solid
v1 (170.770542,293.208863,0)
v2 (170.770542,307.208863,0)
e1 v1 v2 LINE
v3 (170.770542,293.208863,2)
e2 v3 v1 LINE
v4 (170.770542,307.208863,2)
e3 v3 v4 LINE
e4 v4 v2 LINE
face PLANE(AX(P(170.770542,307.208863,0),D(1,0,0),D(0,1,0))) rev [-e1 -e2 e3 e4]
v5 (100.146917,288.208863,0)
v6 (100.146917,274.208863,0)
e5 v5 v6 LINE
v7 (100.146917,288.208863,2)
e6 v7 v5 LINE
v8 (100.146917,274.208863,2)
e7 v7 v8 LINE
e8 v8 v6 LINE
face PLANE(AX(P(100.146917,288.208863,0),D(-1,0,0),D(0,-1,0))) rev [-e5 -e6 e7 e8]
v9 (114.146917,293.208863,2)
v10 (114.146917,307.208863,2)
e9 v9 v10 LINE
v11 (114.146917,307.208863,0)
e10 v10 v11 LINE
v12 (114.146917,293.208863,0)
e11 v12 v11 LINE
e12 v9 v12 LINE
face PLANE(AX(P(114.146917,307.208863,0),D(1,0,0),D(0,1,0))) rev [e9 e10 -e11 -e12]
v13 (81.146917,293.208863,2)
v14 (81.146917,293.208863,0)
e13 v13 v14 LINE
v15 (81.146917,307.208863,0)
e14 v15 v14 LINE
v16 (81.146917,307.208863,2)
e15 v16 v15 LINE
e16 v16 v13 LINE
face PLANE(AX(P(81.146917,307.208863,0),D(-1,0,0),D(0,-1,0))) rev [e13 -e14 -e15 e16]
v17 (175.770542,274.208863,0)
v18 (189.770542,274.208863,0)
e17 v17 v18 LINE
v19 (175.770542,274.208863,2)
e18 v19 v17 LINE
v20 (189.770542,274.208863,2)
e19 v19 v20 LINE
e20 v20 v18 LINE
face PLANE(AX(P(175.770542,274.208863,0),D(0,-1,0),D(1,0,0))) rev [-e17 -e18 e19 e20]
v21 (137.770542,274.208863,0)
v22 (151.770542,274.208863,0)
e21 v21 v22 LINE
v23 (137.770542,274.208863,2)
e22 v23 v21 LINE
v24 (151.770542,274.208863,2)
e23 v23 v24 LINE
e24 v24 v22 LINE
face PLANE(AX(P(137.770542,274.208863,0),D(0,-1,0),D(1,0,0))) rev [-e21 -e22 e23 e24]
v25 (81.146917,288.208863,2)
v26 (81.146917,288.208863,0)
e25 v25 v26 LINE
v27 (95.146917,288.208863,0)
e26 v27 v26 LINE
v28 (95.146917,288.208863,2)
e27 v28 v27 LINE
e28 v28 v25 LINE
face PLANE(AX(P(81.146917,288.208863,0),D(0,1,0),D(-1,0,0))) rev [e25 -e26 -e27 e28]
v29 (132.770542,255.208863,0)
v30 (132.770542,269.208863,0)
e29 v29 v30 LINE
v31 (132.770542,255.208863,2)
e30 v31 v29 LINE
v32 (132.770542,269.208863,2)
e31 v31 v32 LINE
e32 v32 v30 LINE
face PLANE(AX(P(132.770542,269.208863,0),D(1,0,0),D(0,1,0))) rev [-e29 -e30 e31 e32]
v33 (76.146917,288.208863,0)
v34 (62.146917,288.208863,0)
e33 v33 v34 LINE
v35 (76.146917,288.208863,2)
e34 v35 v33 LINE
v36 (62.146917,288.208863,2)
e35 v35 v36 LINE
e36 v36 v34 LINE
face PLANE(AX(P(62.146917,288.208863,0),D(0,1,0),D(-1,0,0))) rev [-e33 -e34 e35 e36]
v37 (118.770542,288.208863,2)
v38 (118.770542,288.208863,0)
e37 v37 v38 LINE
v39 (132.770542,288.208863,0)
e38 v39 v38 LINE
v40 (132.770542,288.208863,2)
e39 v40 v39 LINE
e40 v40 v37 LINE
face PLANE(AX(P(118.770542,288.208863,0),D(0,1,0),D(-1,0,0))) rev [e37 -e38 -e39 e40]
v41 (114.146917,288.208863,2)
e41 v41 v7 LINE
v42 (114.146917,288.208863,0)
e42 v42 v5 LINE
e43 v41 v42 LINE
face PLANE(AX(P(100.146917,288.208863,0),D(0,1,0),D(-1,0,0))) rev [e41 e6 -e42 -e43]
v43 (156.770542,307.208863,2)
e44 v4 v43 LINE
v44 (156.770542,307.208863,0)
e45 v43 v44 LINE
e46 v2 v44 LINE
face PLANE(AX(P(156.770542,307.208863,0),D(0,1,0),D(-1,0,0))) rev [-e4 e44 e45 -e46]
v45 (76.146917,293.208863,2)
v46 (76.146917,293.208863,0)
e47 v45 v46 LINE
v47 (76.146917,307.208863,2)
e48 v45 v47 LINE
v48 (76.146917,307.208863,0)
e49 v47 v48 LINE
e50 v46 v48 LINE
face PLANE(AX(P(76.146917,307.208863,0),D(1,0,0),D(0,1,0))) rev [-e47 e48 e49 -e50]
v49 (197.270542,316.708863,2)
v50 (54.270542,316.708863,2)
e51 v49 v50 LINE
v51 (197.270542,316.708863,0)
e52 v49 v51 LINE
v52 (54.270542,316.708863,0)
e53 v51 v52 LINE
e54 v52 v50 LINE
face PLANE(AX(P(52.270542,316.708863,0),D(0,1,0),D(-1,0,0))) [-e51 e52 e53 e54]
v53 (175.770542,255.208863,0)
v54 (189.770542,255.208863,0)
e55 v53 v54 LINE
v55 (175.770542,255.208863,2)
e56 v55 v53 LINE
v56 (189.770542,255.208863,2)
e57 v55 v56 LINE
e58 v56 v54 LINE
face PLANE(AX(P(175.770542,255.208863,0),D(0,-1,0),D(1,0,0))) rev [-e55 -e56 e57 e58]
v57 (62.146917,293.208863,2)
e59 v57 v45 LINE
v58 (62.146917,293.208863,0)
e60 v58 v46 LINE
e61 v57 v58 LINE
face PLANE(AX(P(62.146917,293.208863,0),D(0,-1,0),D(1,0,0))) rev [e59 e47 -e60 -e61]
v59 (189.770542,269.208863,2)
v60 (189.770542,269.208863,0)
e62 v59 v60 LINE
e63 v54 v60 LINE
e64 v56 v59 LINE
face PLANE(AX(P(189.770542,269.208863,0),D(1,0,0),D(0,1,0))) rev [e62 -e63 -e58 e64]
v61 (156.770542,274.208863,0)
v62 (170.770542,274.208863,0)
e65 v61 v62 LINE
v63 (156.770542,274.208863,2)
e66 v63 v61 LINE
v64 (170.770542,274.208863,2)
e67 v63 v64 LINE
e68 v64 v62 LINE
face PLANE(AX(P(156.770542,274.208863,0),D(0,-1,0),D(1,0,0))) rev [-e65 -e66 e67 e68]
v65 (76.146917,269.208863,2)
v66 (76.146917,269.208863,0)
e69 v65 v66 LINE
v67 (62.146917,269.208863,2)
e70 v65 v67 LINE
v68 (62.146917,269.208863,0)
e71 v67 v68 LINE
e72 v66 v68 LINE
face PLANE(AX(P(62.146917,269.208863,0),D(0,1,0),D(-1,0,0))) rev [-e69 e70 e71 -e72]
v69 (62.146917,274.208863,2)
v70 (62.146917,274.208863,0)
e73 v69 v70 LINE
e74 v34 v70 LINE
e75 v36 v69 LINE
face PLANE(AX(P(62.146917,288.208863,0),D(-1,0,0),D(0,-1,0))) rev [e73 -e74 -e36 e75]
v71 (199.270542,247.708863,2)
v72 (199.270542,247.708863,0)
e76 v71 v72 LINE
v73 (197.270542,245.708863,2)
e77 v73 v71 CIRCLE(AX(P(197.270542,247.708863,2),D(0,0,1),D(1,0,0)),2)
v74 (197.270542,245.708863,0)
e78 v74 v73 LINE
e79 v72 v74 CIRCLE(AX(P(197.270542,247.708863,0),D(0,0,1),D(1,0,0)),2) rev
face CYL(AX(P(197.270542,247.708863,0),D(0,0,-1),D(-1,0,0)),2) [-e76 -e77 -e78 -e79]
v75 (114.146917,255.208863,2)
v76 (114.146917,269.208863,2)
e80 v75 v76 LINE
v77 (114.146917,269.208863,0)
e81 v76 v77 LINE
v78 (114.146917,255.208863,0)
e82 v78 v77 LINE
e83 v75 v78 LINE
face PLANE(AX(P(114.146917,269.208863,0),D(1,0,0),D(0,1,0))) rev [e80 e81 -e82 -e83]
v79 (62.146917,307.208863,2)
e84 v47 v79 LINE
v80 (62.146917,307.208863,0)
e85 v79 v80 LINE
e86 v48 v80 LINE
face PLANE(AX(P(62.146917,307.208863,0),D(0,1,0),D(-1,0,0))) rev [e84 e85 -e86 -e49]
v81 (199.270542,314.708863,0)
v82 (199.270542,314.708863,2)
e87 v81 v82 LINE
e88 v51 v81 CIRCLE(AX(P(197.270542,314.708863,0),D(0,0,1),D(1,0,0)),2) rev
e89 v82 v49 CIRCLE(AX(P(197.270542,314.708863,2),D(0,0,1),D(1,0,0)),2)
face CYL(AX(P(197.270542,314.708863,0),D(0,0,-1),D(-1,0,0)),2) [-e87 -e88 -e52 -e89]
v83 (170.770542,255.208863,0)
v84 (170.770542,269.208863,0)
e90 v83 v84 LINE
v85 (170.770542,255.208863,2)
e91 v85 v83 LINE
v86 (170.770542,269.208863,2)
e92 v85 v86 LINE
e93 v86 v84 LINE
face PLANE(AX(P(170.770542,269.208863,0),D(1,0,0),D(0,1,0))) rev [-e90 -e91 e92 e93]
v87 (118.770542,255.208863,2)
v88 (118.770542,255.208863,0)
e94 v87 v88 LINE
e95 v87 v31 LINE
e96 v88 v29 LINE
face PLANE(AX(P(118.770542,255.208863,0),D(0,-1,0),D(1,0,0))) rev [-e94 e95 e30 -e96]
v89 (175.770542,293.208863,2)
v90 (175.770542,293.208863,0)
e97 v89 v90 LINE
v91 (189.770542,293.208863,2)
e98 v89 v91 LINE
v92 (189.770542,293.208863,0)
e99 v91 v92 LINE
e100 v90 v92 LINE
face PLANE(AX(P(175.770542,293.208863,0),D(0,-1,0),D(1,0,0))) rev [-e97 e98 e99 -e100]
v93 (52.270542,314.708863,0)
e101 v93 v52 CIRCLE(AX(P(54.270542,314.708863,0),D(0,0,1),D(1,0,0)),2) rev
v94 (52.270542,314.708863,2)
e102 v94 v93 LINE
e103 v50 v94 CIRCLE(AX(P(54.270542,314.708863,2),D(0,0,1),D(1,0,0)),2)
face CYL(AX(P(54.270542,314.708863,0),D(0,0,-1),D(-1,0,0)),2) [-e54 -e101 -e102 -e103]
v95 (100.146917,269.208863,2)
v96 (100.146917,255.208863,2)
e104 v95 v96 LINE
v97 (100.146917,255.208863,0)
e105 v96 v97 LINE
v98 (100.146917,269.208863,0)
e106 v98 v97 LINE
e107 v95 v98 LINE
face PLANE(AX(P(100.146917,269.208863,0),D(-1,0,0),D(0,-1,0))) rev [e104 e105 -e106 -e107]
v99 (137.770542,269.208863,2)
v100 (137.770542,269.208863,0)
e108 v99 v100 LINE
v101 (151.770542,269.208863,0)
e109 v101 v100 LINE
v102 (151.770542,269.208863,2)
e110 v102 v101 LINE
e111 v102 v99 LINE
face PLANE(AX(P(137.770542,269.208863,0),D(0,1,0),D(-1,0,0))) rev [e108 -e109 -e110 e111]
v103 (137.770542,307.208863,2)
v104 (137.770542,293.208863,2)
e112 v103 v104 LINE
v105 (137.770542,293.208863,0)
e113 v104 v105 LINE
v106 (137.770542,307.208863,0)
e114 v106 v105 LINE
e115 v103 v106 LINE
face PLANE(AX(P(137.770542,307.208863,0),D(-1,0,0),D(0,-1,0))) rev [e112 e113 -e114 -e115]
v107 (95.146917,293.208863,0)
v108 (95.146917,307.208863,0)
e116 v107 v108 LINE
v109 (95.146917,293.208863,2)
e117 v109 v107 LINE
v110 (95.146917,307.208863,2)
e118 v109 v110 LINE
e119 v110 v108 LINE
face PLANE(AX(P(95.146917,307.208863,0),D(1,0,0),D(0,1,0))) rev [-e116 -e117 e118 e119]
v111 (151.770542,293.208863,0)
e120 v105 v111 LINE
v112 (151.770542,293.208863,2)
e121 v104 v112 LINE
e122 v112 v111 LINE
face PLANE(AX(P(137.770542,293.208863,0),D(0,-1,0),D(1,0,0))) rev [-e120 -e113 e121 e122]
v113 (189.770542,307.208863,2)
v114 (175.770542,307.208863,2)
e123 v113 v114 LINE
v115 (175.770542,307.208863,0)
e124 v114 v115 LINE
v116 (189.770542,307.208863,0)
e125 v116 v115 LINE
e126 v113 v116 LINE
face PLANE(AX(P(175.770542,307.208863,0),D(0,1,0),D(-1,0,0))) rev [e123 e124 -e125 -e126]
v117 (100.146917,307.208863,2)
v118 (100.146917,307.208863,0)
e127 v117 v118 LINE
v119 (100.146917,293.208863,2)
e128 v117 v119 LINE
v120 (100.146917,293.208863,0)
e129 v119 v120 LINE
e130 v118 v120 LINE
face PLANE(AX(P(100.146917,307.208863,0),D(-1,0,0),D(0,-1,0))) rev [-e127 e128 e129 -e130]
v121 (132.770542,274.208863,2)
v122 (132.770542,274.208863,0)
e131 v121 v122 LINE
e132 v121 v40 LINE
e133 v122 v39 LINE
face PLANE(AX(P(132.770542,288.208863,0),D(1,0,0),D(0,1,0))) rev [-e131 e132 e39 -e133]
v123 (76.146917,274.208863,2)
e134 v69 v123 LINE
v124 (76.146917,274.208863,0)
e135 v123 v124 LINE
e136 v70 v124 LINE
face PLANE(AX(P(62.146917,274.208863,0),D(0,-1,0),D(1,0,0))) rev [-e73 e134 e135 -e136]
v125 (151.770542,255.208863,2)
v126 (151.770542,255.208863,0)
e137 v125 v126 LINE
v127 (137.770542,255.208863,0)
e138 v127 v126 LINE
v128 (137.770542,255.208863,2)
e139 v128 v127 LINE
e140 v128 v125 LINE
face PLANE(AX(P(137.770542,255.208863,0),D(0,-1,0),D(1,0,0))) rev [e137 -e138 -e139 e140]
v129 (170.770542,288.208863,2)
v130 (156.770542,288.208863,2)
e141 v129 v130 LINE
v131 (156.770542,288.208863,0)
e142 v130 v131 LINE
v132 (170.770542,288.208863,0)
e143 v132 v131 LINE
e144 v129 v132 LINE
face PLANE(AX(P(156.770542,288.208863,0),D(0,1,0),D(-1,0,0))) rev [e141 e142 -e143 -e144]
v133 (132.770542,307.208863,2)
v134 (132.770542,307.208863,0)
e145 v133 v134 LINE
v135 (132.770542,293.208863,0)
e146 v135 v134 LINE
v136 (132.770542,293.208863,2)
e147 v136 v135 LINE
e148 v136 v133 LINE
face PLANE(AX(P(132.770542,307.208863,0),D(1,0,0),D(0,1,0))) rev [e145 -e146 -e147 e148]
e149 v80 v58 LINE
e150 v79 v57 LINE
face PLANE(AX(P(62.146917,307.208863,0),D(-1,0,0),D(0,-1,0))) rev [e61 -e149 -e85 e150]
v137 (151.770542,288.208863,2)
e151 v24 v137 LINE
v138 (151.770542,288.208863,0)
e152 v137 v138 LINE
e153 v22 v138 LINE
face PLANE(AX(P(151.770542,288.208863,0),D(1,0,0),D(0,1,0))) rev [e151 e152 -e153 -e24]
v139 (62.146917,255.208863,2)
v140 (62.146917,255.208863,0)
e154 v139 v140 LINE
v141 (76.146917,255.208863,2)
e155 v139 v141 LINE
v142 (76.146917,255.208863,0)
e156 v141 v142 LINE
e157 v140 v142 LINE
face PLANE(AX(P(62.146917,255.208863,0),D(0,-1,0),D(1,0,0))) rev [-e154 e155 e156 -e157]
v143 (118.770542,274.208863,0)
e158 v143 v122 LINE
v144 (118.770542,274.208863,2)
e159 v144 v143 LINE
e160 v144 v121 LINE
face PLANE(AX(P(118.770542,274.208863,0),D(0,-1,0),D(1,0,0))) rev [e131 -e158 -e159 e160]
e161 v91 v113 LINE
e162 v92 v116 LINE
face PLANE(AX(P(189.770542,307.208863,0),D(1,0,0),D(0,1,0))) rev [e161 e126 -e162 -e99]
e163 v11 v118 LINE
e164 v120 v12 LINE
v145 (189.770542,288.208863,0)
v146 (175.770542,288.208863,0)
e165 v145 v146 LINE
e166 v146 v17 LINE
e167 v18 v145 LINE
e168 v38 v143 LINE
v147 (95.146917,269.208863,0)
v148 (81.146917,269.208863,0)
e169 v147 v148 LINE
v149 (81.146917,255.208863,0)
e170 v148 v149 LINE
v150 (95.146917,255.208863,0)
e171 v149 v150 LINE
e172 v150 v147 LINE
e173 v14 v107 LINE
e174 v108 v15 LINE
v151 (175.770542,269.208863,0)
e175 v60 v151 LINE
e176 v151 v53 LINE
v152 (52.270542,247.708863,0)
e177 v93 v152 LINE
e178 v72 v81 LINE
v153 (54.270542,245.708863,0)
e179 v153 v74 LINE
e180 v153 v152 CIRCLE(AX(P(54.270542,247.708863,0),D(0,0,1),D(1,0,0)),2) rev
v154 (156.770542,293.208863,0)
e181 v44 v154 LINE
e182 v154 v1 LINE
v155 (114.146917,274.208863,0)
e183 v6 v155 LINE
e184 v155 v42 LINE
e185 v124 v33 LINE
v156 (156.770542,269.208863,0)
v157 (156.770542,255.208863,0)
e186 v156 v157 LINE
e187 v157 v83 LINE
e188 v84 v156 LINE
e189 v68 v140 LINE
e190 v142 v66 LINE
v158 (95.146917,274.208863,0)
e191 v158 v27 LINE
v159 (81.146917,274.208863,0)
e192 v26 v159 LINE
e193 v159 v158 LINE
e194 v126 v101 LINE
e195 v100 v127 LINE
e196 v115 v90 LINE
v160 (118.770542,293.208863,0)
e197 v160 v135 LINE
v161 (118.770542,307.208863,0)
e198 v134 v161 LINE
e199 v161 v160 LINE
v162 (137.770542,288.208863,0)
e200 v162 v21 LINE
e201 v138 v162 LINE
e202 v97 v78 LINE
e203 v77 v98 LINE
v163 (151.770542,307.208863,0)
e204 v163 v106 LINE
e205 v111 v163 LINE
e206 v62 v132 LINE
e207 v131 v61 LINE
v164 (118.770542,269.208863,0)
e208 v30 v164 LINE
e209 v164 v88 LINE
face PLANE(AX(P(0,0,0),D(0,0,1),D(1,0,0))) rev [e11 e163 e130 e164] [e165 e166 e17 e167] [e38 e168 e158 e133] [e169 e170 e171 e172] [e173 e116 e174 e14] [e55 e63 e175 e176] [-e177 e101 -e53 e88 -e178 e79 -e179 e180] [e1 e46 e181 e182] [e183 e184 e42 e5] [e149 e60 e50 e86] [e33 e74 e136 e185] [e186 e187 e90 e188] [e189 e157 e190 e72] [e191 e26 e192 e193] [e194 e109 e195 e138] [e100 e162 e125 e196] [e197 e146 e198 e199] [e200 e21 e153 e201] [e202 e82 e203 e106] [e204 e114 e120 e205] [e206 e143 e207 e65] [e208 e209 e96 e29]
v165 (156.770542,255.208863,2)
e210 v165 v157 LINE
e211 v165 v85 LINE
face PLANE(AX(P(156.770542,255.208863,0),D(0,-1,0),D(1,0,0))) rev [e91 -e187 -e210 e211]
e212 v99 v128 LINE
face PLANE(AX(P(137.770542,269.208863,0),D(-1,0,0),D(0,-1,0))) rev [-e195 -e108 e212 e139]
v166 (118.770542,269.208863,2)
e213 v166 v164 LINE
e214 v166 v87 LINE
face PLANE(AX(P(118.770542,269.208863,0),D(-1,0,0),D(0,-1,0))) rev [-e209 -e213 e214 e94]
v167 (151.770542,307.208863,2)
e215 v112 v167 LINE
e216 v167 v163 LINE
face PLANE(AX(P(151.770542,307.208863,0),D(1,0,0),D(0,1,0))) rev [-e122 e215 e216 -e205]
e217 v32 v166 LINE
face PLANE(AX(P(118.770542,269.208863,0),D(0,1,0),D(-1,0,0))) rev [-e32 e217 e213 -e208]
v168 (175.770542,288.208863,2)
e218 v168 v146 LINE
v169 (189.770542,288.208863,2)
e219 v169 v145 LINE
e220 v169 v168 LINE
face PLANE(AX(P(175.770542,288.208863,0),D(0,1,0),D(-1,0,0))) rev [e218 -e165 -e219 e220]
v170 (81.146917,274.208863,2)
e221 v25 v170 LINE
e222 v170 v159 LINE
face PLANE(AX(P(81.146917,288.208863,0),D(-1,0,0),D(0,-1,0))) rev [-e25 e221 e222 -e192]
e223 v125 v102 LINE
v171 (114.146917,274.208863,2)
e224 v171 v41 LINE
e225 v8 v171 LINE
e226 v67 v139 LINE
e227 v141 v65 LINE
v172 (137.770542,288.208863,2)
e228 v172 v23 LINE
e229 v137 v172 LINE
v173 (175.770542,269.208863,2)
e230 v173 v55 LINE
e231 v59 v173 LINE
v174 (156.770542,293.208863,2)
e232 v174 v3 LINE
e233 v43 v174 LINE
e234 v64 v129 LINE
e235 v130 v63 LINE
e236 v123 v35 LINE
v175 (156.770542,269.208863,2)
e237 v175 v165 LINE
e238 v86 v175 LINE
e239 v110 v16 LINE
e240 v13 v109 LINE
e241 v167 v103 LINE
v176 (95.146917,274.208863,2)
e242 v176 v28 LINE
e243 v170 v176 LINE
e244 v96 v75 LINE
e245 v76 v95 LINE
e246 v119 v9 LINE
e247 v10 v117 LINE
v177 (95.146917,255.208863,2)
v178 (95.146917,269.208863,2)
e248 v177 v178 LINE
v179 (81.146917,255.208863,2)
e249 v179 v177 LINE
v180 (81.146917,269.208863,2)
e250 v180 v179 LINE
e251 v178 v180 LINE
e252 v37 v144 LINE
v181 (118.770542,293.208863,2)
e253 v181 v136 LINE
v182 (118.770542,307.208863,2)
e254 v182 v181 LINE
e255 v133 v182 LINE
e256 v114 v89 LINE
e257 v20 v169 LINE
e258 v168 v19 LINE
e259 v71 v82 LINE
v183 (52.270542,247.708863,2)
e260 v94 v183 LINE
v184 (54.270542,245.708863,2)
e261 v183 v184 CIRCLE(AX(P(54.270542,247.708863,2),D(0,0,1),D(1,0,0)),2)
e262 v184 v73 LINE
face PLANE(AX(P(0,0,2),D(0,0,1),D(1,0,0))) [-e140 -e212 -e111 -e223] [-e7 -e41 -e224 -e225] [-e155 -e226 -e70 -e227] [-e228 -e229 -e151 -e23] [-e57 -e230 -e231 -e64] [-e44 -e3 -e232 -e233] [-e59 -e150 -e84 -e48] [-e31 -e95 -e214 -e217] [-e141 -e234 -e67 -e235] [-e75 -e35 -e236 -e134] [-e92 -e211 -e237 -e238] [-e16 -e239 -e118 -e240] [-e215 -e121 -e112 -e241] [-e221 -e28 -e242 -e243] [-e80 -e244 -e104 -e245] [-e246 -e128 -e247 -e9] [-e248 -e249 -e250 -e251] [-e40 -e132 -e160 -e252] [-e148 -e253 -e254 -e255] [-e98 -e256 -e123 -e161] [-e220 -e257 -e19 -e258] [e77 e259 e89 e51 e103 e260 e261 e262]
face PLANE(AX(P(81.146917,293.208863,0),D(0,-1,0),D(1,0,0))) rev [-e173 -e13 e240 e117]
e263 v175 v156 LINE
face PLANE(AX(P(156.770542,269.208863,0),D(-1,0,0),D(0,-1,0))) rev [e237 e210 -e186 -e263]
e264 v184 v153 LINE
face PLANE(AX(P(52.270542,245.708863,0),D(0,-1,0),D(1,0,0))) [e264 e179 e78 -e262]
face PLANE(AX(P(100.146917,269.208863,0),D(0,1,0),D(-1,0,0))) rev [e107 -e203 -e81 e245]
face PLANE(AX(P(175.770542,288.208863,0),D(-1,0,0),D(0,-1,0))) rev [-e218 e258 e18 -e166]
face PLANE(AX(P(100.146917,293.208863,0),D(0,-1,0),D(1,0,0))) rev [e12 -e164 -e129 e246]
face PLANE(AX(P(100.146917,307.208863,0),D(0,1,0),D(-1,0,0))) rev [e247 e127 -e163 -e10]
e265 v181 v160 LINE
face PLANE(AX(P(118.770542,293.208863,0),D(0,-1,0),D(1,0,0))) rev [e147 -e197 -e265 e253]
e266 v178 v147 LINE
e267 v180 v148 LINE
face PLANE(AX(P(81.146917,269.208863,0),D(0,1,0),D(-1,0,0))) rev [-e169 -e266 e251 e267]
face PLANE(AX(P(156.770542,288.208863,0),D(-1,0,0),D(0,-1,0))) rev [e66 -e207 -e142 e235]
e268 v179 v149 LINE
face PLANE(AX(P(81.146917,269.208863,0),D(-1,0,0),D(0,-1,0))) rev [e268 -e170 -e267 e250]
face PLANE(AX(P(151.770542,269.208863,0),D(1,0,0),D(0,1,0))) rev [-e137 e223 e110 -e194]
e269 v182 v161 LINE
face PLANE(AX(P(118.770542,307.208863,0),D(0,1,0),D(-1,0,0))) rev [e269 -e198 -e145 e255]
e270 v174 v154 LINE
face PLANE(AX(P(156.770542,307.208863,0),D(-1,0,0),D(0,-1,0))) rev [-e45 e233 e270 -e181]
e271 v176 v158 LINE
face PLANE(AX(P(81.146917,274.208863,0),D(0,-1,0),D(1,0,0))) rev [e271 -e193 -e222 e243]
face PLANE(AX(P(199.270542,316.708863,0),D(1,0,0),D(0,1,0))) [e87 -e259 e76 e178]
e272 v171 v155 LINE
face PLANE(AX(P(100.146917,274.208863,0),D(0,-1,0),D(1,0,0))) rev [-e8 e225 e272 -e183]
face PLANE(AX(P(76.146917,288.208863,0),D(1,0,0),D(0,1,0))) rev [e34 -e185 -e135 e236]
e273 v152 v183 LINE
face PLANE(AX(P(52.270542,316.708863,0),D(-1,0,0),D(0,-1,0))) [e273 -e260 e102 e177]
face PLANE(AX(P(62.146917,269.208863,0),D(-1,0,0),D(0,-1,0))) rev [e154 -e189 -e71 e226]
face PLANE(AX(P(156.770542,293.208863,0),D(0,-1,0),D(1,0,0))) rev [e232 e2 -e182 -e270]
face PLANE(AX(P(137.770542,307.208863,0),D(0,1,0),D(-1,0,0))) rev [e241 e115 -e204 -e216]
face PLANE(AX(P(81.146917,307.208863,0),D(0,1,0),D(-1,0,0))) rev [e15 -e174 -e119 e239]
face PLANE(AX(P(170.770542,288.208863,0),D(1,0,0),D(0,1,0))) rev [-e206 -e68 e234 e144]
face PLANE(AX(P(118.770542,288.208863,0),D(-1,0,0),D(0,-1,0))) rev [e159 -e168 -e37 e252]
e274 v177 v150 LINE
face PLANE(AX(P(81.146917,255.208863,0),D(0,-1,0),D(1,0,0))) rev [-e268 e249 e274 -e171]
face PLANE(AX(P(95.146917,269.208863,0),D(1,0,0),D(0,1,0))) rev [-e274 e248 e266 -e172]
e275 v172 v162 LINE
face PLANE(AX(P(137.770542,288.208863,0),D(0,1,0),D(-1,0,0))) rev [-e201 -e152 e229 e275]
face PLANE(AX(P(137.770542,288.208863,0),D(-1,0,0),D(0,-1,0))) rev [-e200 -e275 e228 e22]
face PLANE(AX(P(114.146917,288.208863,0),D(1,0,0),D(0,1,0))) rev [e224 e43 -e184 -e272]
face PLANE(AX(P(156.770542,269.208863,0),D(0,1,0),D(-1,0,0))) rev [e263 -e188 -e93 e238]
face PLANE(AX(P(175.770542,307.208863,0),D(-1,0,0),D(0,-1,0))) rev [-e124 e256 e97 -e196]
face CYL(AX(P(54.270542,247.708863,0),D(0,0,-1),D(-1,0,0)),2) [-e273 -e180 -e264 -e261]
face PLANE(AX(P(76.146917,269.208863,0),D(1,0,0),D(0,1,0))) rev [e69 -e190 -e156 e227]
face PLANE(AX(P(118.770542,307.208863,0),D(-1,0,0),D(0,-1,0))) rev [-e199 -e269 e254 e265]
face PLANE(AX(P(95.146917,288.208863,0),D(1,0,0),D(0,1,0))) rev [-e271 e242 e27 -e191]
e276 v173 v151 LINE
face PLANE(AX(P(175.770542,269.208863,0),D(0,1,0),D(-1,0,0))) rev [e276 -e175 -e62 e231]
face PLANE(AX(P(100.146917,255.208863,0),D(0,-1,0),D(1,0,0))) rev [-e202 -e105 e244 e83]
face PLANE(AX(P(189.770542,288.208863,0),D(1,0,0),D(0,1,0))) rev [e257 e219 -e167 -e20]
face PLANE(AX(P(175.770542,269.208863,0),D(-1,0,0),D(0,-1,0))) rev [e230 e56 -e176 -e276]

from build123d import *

# Parameters (mm, degrees)
MODEL_W             = 147
MODEL_H             = 71
MODEL_W_2           = 14
MODEL_H_2           = 14
BOSS_EXTRUDE1_DEPTH = 2
BREAK_CORNER1_DEPTH = 2


# Read off the part's stored shape, not the designer's step: Break-Corner1
with BuildPart() as part:
    # Model → Boss-Extrude1 (new body)
    with BuildSketch(Plane.XY):
        with Locations((125.770541641, 281.208862918)):
            Rectangle(MODEL_W, MODEL_H)
        with Locations((125.770541641, 262.208862918)):
            Rectangle(MODEL_W_2, MODEL_H_2, mode=Mode.SUBTRACT)
        with Locations((125.770541641, 281.208862918)):
            Rectangle(MODEL_W_2, MODEL_H_2, mode=Mode.SUBTRACT)
        with Locations((125.770541641, 300.208862918)):
            Rectangle(MODEL_W_2, MODEL_H_2, mode=Mode.SUBTRACT)
        with Locations((107.146916797, 300.208862918)):
            Rectangle(MODEL_W_2, MODEL_H_2, mode=Mode.SUBTRACT)
        with Locations((88.146916797, 300.208862918)):
            Rectangle(MODEL_W_2, MODEL_H_2, mode=Mode.SUBTRACT)
        with Locations((69.146916797, 300.208862918)):
            Rectangle(MODEL_W_2, MODEL_H_2, mode=Mode.SUBTRACT)
        with Locations((69.146916797, 281.208862918)):
            Rectangle(MODEL_W_2, MODEL_H_2, mode=Mode.SUBTRACT)
        with Locations((69.146916797, 262.208862918)):
            Rectangle(MODEL_W_2, MODEL_H_2, mode=Mode.SUBTRACT)
        with Locations((88.146916797, 281.208862918)):
            Rectangle(MODEL_W_2, MODEL_H_2, mode=Mode.SUBTRACT)
        with Locations((107.146916797, 281.208862918)):
            Rectangle(MODEL_W_2, MODEL_H_2, mode=Mode.SUBTRACT)
        with Locations((88.146916797, 262.208862918)):
            Rectangle(MODEL_W_2, MODEL_H_2, mode=Mode.SUBTRACT)
        with Locations((107.146916797, 262.208862918)):
            Rectangle(MODEL_W_2, MODEL_H_2, mode=Mode.SUBTRACT)
        with Locations((182.770541641, 300.208862918)):
            Rectangle(MODEL_W_2, MODEL_H_2, mode=Mode.SUBTRACT)
        with Locations((163.770541641, 300.208862918)):
            Rectangle(MODEL_W_2, MODEL_H_2, mode=Mode.SUBTRACT)
        with Locations((144.770541641, 300.208862918)):
            Rectangle(MODEL_W_2, MODEL_H_2, mode=Mode.SUBTRACT)
        with Locations((144.770541641, 281.208862918)):
            Rectangle(MODEL_W_2, MODEL_H_2, mode=Mode.SUBTRACT)
        with Locations((144.770541641, 262.208862918)):
            Rectangle(MODEL_W_2, MODEL_H_2, mode=Mode.SUBTRACT)
        with Locations((163.770541641, 281.208862918)):
            Rectangle(MODEL_W_2, MODEL_H_2, mode=Mode.SUBTRACT)
        with Locations((182.770541641, 281.208862918)):
            Rectangle(MODEL_W_2, MODEL_H_2, mode=Mode.SUBTRACT)
        with Locations((163.770541641, 262.208862918)):
            Rectangle(MODEL_W_2, MODEL_H_2, mode=Mode.SUBTRACT)
        with Locations((182.770541641, 262.208862918)):
            Rectangle(MODEL_W_2, MODEL_H_2, mode=Mode.SUBTRACT)
    extrude(amount=BOSS_EXTRUDE1_DEPTH)

    # Break-Corner1 outline → Break-Corner1 (cut)
    with BuildSketch(Plane.XY):
        with BuildLine():
            Line((199.270541641, 245.708862918), (199.270541641, 247.708862918))
            ThreePointArc((199.270541641, 247.708862918), (198.684755203, 246.294649356), (197.270541641, 245.708862918))
            Line((197.270541641, 245.708862918), (199.270541641, 245.708862918))
        make_face()
        with BuildLine():
            ThreePointArc((197.270541641, 316.708862918), (198.684755204, 316.123076481), (199.270541641, 314.708862918))
            Line((199.270541641, 314.708862918), (199.270541641, 316.708862918))
            Line((199.270541641, 316.708862918), (197.270541641, 316.708862918))
        make_face()
        with BuildLine():
            Line((52.270541641, 245.708862918), (54.270541641, 245.708862918))
            ThreePointArc((54.270541641, 245.708862918), (52.856328079, 246.294649356), (52.270541641, 247.708862918))
            Line((52.270541641, 247.708862918), (52.270541641, 245.708862918))
        make_face()
        with BuildLine():
            ThreePointArc((52.270541641, 314.708862918), (52.856328079, 316.123076481), (54.270541641, 316.708862918))
            Line((54.270541641, 316.708862918), (52.270541641, 316.708862918))
            Line((52.270541641, 316.708862918), (52.270541641, 314.708862918))
        make_face()
    extrude(amount=BREAK_CORNER1_DEPTH, mode=Mode.SUBTRACT)


solid = part.part
